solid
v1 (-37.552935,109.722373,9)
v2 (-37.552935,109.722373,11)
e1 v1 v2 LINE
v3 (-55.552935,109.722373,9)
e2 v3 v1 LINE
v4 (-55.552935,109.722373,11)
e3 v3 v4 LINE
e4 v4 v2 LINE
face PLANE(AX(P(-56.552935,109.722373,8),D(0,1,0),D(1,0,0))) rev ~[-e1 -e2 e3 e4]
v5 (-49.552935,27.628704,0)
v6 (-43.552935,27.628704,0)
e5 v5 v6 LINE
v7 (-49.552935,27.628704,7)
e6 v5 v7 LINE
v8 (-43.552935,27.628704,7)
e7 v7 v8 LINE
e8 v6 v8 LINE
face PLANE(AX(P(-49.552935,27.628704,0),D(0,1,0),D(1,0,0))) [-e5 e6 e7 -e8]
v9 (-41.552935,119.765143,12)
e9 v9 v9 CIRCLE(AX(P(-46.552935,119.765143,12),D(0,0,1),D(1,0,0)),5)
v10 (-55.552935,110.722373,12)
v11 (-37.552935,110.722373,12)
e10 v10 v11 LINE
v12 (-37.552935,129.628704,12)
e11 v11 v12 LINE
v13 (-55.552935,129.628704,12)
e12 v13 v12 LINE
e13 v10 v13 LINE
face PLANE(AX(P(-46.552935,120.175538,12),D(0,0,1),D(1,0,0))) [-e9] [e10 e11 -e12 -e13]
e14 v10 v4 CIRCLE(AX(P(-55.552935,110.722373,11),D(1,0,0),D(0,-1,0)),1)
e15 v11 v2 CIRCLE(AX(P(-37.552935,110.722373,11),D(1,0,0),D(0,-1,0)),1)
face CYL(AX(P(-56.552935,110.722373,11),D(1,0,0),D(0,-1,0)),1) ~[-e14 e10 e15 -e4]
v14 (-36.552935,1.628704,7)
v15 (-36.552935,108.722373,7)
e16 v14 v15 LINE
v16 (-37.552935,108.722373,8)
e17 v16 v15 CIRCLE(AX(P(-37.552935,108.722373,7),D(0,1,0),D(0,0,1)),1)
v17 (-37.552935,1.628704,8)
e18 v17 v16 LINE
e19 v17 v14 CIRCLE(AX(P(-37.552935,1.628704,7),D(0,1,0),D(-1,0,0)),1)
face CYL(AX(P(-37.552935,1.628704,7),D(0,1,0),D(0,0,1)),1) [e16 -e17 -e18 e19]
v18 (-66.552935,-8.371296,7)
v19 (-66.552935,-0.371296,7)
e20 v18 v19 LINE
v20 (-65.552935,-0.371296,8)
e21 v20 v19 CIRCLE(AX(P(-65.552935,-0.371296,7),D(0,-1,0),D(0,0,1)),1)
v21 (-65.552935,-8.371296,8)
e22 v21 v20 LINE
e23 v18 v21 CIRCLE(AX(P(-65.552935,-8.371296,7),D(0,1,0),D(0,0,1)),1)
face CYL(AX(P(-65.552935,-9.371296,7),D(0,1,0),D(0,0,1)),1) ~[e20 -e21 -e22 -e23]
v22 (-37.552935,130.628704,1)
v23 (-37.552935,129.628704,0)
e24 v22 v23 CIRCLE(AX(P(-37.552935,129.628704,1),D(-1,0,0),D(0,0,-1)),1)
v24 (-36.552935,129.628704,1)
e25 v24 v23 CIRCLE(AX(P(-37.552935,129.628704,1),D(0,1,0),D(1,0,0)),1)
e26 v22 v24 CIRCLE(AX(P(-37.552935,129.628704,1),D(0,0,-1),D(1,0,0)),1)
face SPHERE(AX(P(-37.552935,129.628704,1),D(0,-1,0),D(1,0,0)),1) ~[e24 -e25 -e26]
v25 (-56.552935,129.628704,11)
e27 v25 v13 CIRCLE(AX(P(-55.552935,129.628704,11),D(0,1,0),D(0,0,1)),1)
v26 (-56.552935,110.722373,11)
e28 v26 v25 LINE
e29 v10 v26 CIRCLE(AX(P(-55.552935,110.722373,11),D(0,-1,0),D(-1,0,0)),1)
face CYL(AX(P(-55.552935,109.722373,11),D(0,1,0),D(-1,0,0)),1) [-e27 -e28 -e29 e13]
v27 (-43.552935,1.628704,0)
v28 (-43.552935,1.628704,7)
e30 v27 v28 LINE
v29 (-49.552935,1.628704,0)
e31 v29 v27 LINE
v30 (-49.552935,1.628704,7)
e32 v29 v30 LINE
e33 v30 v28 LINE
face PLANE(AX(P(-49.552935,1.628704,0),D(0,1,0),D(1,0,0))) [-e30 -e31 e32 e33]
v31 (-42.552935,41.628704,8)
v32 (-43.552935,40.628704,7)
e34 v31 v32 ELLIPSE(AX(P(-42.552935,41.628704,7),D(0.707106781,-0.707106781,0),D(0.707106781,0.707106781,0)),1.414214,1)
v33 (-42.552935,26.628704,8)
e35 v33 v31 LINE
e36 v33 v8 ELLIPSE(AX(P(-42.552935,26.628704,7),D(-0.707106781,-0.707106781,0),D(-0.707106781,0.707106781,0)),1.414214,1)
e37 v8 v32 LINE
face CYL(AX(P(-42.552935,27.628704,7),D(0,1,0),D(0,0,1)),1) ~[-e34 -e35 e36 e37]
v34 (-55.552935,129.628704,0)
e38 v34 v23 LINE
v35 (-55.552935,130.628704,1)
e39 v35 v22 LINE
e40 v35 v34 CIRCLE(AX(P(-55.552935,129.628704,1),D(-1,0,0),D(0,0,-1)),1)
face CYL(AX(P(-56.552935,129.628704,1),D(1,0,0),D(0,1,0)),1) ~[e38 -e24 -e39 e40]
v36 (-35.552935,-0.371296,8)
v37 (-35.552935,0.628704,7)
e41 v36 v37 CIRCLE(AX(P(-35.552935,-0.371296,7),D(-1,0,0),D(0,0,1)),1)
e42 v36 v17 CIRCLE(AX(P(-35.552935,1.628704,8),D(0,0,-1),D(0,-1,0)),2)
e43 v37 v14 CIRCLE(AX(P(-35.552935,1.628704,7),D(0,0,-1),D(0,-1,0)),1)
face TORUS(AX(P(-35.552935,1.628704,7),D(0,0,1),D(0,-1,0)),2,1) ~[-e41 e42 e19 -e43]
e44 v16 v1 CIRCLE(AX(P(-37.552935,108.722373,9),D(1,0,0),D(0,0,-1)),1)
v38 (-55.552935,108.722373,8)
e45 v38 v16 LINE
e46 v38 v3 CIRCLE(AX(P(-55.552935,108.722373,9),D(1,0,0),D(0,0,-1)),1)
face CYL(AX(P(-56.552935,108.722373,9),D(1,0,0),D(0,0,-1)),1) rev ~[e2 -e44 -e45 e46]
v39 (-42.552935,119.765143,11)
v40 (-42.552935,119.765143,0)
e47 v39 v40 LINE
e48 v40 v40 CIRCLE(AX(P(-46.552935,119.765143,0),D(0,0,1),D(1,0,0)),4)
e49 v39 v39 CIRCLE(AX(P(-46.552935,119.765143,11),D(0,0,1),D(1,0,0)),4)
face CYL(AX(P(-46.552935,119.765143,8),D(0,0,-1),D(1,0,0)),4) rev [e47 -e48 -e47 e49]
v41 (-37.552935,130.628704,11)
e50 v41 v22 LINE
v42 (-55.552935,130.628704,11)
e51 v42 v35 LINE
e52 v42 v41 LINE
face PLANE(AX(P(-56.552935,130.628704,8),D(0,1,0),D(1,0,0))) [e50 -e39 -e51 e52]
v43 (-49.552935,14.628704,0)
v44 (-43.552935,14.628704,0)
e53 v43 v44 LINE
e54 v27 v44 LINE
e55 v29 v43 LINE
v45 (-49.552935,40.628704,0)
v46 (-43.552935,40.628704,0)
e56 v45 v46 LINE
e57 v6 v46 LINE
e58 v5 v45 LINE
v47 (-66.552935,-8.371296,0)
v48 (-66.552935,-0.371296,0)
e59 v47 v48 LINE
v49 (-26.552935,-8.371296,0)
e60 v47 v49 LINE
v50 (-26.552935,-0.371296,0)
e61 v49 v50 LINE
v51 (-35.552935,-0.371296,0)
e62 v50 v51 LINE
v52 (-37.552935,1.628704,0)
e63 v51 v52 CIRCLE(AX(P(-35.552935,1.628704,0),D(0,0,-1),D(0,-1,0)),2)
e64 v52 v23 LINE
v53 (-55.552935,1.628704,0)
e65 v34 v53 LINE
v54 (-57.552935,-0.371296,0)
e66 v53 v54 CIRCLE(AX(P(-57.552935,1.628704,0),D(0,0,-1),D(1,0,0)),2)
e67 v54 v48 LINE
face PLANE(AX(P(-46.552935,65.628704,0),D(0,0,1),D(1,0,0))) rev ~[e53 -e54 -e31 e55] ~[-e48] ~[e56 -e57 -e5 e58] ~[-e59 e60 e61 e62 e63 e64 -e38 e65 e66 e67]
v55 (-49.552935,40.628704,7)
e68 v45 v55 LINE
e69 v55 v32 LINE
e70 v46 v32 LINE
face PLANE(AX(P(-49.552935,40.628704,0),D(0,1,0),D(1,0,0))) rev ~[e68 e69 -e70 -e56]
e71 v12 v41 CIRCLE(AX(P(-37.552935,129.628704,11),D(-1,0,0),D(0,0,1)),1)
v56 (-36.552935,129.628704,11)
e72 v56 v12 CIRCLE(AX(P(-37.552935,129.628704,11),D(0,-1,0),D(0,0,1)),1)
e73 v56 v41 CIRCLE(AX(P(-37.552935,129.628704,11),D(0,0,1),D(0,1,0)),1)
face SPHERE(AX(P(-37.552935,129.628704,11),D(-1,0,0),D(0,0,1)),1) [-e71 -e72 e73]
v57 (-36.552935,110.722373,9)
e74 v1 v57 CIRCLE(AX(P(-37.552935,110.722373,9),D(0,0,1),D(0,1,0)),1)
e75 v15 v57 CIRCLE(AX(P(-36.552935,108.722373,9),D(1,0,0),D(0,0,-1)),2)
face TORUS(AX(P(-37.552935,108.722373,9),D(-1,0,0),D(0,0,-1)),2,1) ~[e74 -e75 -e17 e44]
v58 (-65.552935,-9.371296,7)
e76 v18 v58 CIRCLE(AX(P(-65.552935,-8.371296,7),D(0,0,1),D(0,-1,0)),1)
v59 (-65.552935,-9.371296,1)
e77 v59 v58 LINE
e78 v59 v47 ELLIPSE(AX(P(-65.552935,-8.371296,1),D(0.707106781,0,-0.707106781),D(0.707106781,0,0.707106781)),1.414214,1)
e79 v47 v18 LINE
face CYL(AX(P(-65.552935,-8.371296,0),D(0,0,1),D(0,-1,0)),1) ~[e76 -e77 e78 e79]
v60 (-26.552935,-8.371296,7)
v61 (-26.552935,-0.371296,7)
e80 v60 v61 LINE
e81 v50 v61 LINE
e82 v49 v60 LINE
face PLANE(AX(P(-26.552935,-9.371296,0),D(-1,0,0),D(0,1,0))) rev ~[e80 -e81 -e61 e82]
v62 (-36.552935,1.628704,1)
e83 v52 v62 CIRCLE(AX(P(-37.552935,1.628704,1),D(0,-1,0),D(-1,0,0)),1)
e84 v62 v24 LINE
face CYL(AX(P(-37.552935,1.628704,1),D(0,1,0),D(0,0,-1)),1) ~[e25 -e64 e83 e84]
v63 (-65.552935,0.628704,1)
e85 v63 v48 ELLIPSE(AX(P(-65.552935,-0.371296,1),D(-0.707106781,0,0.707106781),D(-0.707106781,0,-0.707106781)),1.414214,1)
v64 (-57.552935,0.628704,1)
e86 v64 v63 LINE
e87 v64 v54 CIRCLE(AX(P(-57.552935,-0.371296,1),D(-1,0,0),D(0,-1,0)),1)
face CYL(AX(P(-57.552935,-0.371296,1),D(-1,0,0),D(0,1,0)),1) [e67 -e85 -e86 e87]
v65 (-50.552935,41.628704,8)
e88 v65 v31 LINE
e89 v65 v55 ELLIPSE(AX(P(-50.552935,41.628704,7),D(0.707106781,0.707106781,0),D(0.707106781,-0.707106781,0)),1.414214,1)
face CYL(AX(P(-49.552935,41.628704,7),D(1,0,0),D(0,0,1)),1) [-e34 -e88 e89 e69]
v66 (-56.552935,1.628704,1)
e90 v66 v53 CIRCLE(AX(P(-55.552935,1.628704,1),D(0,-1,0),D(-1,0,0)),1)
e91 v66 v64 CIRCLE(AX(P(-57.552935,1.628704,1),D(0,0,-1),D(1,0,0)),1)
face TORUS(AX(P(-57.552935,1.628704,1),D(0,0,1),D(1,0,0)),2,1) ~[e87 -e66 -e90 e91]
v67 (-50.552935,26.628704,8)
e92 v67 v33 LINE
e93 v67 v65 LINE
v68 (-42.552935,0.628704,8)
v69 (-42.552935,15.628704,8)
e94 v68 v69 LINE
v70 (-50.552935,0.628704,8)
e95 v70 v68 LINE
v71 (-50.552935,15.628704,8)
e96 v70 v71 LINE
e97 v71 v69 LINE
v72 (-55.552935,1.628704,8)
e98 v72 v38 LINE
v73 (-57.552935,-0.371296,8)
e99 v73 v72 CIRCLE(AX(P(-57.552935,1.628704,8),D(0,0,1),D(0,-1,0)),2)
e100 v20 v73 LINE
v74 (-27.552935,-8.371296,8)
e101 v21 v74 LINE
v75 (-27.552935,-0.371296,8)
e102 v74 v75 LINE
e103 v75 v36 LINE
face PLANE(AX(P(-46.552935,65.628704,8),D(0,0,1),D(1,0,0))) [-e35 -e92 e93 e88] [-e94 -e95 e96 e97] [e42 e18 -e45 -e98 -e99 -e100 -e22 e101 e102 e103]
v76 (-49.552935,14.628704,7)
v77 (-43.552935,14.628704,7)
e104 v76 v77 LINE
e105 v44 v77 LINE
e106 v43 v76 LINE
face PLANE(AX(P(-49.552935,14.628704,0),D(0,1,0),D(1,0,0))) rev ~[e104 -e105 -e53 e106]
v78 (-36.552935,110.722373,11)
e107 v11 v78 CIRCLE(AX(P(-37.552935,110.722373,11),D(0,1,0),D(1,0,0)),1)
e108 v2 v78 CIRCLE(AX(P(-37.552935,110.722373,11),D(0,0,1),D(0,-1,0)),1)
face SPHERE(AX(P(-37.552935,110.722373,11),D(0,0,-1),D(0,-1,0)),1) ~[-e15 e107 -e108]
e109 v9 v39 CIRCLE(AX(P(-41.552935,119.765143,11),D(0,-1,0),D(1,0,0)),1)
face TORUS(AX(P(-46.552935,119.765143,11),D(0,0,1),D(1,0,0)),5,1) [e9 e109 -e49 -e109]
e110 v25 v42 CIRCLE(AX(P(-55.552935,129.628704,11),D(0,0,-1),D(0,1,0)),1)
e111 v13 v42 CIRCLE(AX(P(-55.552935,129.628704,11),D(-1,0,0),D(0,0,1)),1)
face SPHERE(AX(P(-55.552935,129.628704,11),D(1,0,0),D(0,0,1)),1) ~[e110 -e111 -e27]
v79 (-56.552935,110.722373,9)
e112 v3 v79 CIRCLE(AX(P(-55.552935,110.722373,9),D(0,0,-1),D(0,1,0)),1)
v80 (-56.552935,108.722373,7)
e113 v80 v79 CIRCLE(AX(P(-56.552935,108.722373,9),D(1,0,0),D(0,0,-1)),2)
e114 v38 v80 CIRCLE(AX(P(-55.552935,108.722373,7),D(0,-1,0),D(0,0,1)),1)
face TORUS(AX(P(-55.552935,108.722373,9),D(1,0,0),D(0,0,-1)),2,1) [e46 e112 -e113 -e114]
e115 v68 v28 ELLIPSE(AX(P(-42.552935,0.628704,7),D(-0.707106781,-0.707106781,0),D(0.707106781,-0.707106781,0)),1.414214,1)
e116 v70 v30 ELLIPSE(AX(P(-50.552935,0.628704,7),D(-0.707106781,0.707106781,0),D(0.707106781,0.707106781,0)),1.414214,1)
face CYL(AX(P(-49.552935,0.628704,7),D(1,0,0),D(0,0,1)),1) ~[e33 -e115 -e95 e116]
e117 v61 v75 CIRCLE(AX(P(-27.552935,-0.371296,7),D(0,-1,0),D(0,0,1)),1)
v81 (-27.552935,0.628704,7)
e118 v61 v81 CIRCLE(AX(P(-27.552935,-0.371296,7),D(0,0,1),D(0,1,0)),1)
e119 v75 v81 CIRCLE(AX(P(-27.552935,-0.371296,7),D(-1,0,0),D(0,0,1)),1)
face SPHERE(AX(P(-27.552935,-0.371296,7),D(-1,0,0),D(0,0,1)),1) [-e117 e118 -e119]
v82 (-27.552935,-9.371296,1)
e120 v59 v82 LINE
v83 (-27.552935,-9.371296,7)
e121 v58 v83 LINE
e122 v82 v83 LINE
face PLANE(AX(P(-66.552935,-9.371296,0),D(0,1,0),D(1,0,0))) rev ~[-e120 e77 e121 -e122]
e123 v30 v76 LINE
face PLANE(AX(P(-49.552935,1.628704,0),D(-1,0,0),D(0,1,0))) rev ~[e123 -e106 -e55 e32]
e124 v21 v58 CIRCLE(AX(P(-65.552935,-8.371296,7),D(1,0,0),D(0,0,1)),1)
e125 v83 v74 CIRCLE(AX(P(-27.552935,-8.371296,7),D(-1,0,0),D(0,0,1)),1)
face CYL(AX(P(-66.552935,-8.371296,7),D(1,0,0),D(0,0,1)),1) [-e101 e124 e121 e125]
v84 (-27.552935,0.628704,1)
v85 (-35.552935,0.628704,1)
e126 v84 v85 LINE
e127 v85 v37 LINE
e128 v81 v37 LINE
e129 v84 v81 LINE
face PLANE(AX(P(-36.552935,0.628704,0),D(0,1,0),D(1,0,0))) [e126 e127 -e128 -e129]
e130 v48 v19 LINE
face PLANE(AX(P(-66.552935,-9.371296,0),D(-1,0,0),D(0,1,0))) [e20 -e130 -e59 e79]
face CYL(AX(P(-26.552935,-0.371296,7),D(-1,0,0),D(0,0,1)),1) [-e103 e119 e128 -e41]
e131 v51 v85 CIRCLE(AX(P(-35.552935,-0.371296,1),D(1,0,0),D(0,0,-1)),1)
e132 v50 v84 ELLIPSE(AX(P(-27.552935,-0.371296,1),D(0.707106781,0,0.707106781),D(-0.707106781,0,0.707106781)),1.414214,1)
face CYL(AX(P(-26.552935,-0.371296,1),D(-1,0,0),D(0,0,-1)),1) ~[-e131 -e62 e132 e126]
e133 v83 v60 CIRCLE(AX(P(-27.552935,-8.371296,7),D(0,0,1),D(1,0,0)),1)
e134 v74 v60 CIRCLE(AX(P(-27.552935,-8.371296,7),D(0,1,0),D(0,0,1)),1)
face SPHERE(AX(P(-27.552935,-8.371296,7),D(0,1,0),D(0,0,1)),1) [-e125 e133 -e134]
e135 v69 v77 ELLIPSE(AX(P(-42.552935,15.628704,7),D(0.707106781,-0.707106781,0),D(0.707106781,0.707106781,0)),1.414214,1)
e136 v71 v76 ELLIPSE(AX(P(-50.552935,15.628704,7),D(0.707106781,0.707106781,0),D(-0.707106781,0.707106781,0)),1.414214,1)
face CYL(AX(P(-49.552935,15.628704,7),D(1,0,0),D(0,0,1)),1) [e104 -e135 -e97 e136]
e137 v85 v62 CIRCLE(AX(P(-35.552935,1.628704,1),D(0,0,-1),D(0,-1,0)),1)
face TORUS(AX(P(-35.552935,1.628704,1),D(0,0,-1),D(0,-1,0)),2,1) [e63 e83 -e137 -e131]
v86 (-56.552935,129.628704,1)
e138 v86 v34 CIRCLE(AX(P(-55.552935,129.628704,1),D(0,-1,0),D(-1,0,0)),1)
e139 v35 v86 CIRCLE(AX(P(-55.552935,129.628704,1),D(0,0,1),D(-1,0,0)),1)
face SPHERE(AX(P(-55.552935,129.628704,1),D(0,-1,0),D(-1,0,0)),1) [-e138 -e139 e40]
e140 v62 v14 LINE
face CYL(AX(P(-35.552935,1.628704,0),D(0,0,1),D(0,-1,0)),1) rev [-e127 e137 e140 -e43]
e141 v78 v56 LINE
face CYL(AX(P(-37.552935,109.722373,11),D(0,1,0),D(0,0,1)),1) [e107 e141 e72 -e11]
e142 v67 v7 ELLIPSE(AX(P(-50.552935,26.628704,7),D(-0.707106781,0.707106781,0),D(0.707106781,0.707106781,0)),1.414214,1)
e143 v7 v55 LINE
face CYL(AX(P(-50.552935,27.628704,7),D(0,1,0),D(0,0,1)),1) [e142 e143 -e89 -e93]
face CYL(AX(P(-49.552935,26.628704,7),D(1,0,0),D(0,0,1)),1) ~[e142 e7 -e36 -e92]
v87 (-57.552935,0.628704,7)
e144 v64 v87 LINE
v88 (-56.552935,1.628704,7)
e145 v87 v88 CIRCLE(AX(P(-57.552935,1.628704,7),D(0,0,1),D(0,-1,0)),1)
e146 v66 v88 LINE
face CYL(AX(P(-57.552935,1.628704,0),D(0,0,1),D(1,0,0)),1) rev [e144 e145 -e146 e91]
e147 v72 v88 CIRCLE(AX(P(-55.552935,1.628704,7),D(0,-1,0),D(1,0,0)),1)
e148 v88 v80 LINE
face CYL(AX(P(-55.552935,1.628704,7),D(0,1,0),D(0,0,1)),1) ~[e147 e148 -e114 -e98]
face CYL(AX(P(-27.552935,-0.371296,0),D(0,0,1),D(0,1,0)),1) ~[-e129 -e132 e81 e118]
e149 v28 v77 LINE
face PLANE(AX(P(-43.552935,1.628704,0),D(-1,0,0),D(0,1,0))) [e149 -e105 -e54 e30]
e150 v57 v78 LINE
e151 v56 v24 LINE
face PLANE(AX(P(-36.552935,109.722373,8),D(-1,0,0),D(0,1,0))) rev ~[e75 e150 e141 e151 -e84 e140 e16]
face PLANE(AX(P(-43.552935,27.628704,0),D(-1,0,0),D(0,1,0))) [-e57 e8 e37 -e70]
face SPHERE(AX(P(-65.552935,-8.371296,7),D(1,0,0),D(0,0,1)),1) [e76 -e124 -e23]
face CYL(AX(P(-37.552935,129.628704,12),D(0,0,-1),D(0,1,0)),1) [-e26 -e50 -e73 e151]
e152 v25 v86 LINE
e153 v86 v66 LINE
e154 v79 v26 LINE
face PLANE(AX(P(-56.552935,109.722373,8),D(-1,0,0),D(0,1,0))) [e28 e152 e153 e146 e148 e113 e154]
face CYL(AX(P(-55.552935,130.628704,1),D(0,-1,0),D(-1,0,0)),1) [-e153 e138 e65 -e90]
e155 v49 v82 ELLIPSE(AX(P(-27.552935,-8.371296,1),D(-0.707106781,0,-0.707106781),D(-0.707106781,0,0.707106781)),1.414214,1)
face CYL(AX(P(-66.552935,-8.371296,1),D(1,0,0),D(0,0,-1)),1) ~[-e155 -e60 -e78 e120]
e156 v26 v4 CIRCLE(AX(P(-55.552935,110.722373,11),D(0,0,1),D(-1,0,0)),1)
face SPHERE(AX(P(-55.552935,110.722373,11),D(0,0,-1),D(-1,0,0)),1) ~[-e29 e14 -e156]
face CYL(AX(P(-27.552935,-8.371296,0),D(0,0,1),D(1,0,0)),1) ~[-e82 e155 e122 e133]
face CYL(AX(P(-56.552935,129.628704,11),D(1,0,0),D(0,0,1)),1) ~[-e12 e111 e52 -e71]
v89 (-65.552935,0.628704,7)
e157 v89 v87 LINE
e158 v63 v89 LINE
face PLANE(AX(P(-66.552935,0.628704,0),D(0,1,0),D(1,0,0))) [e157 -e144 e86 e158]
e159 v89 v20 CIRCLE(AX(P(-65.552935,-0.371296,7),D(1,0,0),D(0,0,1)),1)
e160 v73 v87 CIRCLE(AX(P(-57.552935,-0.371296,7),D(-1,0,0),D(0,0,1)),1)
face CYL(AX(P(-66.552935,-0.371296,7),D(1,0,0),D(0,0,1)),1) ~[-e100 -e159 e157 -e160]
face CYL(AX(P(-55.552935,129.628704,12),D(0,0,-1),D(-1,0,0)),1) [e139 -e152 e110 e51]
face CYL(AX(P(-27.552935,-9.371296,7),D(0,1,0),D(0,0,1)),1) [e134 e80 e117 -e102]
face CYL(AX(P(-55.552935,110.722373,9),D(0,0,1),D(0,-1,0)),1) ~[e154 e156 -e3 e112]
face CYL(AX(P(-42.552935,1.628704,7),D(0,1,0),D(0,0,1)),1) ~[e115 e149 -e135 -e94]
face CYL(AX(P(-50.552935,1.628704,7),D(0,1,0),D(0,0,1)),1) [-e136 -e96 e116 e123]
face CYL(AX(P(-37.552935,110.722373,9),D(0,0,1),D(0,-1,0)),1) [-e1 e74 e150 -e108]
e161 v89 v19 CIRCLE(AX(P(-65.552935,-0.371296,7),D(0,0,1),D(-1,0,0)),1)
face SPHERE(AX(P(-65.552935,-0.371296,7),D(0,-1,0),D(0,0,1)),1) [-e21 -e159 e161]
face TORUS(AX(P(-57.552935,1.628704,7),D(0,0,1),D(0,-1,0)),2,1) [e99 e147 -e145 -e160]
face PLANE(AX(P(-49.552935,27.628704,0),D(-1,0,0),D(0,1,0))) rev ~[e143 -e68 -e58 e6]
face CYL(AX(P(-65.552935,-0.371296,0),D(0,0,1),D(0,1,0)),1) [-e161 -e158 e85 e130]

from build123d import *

# Parameters (mm, degrees)
F0_W     = 20
F0_H     = 130
F0_W_2   = 6
F0_H_2   = 13
F0_H_3   = 10
F0_W_3   = 10
F1_DEPTH = 8
F2_R     = 4
F3_DEPTH = 50
F2_W     = 20
F2_H     = 20.9063310176
F4_DEPTH = 4
F5_F1_R  = 1
F5_F2_R  = 1


with BuildPart() as f1:
    # F0 (on Top) → F1 (new body)
    with BuildSketch(Plane.XY):
        with Locations((-46.5529351234, 65.628703773)):
            Rectangle(F0_W, F0_H)
        with Locations((-46.5529351234, 8.128703773)):
            Rectangle(F0_W_2, F0_H_2, mode=Mode.SUBTRACT)
        with Locations((-46.5529351234, 34.128703773)):
            Rectangle(F0_W_2, F0_H_2, mode=Mode.SUBTRACT)
        with Locations((-46.5529351234, -4.371296227)):
            Rectangle(F0_W, F0_H_3)
        with Locations((-61.5529351234, -4.371296227)):
            Rectangle(F0_W_3, F0_H_3)
        with Locations((-31.5529351234, -4.371296227)):
            Rectangle(F0_W_3, F0_H_3)
    extrude(amount=F1_DEPTH)

    # F2 (on face) → F3 (cut, symmetric)
    with BuildSketch(Plane.XY.offset(8)):
        with Locations((-46.5529351234, 119.7651425898)):
            Circle(F2_R)
    extrude(amount=F3_DEPTH, both=True, mode=Mode.SUBTRACT)

    # F2 (on face) → F4 (join)
    with BuildSketch(Plane.XY.offset(8)):
        with Locations((-46.5529351234, 120.1755382642)):
            Rectangle(F2_W, F2_H)
        with Locations((-46.5529351234, 119.7651425898)):
            Circle(F2_R, mode=Mode.SUBTRACT)
    extrude(amount=F4_DEPTH)

    # F5: fillet of radius 1 on 35 edges, made by hand

    # F5_f1
    f5_f1_edges = [f1.edges().sort_by_distance(p)[0] for p in [
        (-46.5529351234, 109.7223727554, 8),
        (-36.5529351234, 0.628703773, 4),
        (-56.5529351234, 0.628703773, 4),
    ]]
    fillet(f5_f1_edges, radius=F5_F1_R)

    # F5_f2
    f5_f2_edges = [f1.edges().sort_by_distance(p)[0] for p in [
        (-36.5529351234, 55.1755382642, 8),
        (-31.0529351234, 0.628703773, 8),
        (-26.5529351234, -4.371296227, 8),
        (-46.5529351234, -9.371296227, 8),
        (-66.5529351234, -4.371296227, 8),
        (-62.0529351234, 0.628703773, 8),
        (-56.5529351234, 55.1755382642, 8),
        (-49.5529351234, 8.128703773, 8),
        (-46.5529351234, 1.628703773, 8),
        (-46.5529351234, 14.628703773, 8),
        (-43.5529351234, 8.128703773, 8),
        (-46.5529351234, 40.628703773, 8),
        (-49.5529351234, 34.128703773, 8),
        (-43.5529351234, 34.128703773, 8),
        (-46.5529351234, 27.628703773, 8),
        (-36.5529351234, 66.128703773, 0),
        (-56.5529351234, 66.128703773, 0),
        (-46.5529351234, 130.628703773, 12),
        (-56.5529351234, 120.1755382642, 12),
        (-46.5529351234, 109.7223727554, 12),
        (-36.5529351234, 120.1755382642, 12),
        (-50.5529351234, 119.7651425898, 12),
        (-26.5529351234, 0.628703773, 4),
        (-31.0529351234, 0.628703773, 0),
        (-66.5529351234, 0.628703773, 4),
        (-62.0529351234, 0.628703773, 0),
        (-36.5529351234, 130.628703773, 6),
        (-56.5529351234, 130.628703773, 6),
        (-46.5529351234, 130.628703773, 0),
        (-66.5529351234, -9.371296227, 4),
        (-26.5529351234, -9.371296227, 4),
        (-46.5529351234, -9.371296227, 0),
        (-56.8458283423, 0.9215969918, 0),
        (-36.2600419046, 0.9215969918, 0),
        (-56.5529351234, 109.4294795366, 8.2928932188),
        (-56.8458283423, 0.9215969918, 8),
        (-36.2600419046, 0.9215969918, 8),
        (-36.5529351234, 109.4294795366, 8.2928932188),
    ]]
    fillet(f5_f2_edges, radius=F5_F2_R)


solid = f1.part
